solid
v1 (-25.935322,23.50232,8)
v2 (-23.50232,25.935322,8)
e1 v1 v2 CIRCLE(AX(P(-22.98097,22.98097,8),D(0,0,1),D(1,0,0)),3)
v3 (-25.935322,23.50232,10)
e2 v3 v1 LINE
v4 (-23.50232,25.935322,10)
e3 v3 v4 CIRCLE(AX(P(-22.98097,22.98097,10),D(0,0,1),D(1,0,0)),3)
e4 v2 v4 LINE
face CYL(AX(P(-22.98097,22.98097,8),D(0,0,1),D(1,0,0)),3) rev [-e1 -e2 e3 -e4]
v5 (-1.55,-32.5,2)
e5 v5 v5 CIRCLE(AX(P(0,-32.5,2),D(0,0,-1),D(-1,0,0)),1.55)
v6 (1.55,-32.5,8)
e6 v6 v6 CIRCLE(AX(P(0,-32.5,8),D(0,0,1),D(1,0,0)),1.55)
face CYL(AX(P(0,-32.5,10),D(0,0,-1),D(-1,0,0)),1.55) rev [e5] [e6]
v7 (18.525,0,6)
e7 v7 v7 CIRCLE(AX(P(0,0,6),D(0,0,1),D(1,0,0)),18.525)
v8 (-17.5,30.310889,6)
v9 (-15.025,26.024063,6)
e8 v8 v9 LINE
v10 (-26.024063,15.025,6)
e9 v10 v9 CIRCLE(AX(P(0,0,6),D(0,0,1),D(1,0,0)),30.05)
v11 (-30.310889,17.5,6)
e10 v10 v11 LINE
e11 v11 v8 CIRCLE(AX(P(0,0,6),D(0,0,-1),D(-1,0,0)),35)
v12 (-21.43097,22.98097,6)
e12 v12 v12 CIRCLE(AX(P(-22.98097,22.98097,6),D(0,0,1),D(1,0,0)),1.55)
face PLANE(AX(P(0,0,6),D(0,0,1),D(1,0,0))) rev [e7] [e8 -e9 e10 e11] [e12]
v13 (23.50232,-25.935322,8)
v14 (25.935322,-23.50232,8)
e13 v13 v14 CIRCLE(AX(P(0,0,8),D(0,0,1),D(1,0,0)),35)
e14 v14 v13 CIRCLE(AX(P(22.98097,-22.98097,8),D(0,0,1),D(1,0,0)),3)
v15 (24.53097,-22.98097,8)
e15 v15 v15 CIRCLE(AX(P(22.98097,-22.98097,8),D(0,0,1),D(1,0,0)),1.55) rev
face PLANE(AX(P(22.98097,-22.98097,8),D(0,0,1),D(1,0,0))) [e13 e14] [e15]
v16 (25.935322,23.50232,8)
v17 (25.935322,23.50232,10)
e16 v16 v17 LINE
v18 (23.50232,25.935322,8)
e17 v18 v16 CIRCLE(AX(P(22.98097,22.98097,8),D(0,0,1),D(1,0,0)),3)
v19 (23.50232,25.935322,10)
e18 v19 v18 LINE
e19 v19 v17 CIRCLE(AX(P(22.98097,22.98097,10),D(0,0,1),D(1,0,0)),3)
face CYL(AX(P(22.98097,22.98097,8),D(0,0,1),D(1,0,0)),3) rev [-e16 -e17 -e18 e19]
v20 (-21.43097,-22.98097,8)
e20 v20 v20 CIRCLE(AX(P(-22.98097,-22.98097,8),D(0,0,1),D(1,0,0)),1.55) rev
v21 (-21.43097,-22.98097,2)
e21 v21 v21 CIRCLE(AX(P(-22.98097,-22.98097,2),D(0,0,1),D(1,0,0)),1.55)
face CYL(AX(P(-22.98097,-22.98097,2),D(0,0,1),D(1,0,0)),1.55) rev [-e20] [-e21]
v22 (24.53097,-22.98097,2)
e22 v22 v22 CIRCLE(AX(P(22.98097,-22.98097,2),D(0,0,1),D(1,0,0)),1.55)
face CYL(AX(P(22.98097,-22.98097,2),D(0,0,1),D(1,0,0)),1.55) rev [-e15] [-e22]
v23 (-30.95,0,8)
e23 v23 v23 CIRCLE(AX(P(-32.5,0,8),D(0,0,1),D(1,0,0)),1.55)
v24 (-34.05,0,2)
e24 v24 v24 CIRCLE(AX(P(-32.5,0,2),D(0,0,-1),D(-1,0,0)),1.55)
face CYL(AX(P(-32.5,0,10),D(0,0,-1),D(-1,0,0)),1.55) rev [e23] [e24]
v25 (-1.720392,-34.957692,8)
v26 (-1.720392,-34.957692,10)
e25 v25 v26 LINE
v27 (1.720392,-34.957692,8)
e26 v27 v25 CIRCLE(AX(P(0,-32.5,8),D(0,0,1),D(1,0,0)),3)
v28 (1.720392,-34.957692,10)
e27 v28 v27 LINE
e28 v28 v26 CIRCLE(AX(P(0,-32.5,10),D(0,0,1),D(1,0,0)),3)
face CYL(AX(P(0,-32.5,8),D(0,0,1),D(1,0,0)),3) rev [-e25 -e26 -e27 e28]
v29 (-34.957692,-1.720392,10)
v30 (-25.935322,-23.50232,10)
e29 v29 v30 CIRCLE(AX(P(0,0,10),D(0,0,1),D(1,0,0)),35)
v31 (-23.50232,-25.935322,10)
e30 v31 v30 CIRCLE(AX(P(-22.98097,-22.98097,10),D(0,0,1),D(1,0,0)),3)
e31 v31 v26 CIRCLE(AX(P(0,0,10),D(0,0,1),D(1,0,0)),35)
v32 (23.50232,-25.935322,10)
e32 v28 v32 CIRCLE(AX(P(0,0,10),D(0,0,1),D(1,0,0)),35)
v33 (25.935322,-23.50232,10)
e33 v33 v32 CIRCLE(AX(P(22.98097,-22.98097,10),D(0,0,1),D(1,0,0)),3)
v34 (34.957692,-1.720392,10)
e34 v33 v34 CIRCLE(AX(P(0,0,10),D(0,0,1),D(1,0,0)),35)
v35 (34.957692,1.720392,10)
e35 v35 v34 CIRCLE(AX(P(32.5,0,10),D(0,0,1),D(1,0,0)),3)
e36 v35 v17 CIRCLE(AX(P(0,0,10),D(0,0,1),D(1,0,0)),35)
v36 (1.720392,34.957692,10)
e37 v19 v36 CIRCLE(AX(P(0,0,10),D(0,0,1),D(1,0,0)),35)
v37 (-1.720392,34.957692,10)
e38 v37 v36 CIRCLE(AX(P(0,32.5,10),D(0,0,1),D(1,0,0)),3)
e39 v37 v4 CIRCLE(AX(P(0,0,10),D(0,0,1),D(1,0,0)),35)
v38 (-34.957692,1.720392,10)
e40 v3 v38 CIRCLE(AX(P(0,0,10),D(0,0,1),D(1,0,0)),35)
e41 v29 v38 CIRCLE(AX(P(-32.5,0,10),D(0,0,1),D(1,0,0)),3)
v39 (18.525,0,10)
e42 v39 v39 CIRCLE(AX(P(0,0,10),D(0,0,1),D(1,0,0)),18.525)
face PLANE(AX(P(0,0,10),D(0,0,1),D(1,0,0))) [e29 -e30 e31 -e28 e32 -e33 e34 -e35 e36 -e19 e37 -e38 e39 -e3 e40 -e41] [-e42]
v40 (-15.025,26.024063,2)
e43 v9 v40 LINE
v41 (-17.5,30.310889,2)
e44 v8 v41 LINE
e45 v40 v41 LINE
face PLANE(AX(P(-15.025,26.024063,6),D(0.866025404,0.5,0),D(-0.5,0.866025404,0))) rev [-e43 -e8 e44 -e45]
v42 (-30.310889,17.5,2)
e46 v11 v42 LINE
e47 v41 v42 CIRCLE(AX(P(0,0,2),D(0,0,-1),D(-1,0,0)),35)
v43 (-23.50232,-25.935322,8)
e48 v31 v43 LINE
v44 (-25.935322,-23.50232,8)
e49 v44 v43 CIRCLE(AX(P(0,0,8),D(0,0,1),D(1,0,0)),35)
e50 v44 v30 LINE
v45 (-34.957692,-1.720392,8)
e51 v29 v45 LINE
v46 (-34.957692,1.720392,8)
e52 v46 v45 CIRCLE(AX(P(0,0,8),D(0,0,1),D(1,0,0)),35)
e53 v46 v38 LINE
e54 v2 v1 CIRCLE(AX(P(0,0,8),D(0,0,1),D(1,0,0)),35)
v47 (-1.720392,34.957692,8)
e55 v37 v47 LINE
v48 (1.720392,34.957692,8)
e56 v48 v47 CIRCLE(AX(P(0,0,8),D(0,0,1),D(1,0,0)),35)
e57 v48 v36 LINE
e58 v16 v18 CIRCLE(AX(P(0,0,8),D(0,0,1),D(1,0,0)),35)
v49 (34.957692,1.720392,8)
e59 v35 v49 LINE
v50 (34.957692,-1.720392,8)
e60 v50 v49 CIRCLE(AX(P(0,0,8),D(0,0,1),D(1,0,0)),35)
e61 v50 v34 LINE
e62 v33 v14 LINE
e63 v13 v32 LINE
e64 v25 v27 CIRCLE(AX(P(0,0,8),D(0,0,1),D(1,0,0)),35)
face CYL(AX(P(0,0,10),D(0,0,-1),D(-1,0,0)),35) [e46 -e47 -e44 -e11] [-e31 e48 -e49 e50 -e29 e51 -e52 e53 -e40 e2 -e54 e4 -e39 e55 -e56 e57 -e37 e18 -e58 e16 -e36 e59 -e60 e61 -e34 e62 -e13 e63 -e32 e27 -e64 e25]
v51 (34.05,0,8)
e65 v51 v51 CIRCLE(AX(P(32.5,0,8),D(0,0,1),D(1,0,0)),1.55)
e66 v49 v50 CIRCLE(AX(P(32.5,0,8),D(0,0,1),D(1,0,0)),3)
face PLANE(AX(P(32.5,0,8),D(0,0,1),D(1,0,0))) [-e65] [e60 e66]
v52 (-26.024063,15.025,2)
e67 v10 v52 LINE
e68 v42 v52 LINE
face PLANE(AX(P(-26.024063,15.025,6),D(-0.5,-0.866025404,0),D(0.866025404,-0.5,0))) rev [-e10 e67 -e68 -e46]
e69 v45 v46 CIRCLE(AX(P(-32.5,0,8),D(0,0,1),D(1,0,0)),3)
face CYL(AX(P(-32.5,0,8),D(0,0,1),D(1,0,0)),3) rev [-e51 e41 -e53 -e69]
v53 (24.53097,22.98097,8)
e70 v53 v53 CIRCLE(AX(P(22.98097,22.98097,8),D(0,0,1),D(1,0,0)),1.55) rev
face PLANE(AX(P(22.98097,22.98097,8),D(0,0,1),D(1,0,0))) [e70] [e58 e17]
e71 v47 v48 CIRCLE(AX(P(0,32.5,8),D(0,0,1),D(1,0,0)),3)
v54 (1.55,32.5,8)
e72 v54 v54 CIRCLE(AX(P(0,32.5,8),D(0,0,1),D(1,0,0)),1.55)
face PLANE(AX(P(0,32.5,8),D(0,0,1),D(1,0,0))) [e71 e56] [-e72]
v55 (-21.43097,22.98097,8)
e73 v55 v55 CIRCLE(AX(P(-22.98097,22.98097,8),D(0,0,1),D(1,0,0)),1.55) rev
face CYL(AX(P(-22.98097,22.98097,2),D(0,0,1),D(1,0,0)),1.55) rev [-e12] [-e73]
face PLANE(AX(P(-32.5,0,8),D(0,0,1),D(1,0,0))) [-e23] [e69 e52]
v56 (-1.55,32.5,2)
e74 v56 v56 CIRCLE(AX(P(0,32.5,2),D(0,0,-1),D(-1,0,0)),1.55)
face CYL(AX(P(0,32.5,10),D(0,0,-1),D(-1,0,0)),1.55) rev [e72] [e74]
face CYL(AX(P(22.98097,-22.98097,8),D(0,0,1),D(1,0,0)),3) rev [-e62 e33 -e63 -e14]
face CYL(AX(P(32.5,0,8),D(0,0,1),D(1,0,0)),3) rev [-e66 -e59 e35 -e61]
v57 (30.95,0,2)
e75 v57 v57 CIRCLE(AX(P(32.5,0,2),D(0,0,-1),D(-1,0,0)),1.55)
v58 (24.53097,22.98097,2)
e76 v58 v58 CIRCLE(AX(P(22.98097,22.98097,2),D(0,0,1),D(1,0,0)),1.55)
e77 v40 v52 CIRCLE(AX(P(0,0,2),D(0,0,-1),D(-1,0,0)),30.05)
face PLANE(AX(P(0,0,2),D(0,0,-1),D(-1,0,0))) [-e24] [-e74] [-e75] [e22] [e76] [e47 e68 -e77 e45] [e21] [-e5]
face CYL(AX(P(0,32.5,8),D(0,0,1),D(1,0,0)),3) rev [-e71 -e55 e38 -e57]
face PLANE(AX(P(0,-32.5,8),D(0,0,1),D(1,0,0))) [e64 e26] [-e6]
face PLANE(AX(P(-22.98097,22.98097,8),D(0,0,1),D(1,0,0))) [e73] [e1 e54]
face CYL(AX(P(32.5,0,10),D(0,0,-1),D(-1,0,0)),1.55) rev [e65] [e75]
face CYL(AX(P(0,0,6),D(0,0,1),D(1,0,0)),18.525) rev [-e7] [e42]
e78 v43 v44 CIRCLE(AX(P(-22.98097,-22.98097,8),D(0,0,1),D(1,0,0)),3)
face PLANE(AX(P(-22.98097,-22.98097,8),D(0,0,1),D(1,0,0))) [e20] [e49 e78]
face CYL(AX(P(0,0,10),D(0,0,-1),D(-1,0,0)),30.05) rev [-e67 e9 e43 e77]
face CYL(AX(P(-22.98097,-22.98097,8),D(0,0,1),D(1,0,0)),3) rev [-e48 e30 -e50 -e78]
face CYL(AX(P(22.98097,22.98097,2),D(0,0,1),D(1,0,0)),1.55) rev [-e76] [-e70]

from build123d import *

# Parameters (mm, degrees)
EXTRUDE_1_OUTLINE_R   = 35
EXTRUDE_1_OUTLINE_R_2 = 1.55
EXTRUDE_1_OUTLINE_R_3 = 30.05
EXTRUDE_1_DEPTH       = 10
SKETCH_2_R            = 33.525
SKETCH_2_R_2          = 18.525
EXTRUDE_1_2_DEPTH     = 4
SKETCH_3_R            = 1.55
CUT_EXTRUDE_1_DEPTH   = 51.497524692
CUT_EXTRUDE_2_DEPTH   = 6
SKETCH_8_R            = 35
SKETCH_8_R_2          = 30.05
CUT_EXTRUDE_3_DEPTH   = 2
SKETCH_9_R            = 3
CUT_EXTRUDE_4_DEPTH   = 2
SKETCH_10_R           = 1.55
CUT_EXTRUDE_5_DEPTH   = 51.139804547
SKETCH_11_R           = 3
CUT_EXTRUDE_6_DEPTH   = 2


# Read off the part's stored shape, not the designer's step: 凸台-拉伸1
with BuildPart() as part:
    # Extrude 1 outline → Extrude 1 (new body)
    with BuildSketch(Plane.XY):
        Circle(EXTRUDE_1_OUTLINE_R)
        with Locations((0, -32.5)):
            Circle(EXTRUDE_1_OUTLINE_R_2, mode=Mode.SUBTRACT)
        with Locations((-32.5, 0)):
            Circle(EXTRUDE_1_OUTLINE_R_2, mode=Mode.SUBTRACT)
        Circle(EXTRUDE_1_OUTLINE_R_3, mode=Mode.SUBTRACT)
        with Locations((32.5, 0)):
            Circle(EXTRUDE_1_OUTLINE_R_2, mode=Mode.SUBTRACT)
        with Locations((0, 32.5)):
            Circle(EXTRUDE_1_OUTLINE_R_2, mode=Mode.SUBTRACT)
    extrude(amount=EXTRUDE_1_DEPTH)

    # 草图2 → Extrude 1 2 (add)
    with BuildSketch(Plane.XY.offset(10)):
        Circle(SKETCH_2_R)
        Circle(SKETCH_2_R_2, mode=Mode.SUBTRACT)
    extrude(amount=-EXTRUDE_1_2_DEPTH)

    # 草图3 → 切除-拉伸1 (cut, through all)
    with BuildSketch(Plane(origin=(0, 0, 0), x_dir=(-1, 0, 0), z_dir=(0, 0, -1))):
        with Locations(Location((32.5, 0, 0), (0, 0, 180))):
            Circle(SKETCH_3_R)
        with Locations(Location((0, -32.5, 0), (0, 0, 180))):
            Circle(SKETCH_3_R)
        with Locations(Location((-32.5, 0, 0), (0, 0, 180))):
            Circle(SKETCH_3_R)
        with Locations(Location((0, 32.5, 0), (0, 0, 180))):
            Circle(SKETCH_3_R)
    extrude(amount=-CUT_EXTRUDE_1_DEPTH, mode=Mode.SUBTRACT)

    # 草图7 → 切除-拉伸2 (cut)
    with BuildSketch(Plane(origin=(0, 0, 0), x_dir=(-1, 0, 0), z_dir=(0, 0, -1))):
        with BuildLine():
            Line((15.025, 26.024063384), (17.5, 30.310889132))
            ThreePointArc((17.5, 30.310889132), (24.748737342, 24.748737342), (30.310889132, 17.5))
            Line((30.310889132, 17.5), (26.024063384, 15.025))
            ThreePointArc((26.024063384, 15.025), (21.248558775, 21.248558775), (15.025, 26.024063384))
        make_face()
    extrude(amount=-CUT_EXTRUDE_2_DEPTH, mode=Mode.SUBTRACT)

    # 草图8 → 切除-拉伸3 (cut)
    with BuildSketch(Plane(origin=(0, 0, 0), x_dir=(-1, 0, 0), z_dir=(0, 0, -1))):
        with Locations(Location((0, 0, 0), (0, 0, 30))):
            Circle(SKETCH_8_R)
        Circle(SKETCH_8_R_2, mode=Mode.SUBTRACT)
    extrude(amount=-CUT_EXTRUDE_3_DEPTH, mode=Mode.SUBTRACT)

    # 草图9 → 切除-拉伸4 (cut)
    with BuildSketch(Plane.XY.offset(10)):
        with Locations((0, 32.5)):
            Circle(SKETCH_9_R)
        with Locations((32.5, 0)):
            Circle(SKETCH_9_R)
        with Locations((0, -32.5)):
            Circle(SKETCH_9_R)
        with Locations((-32.5, 0)):
            Circle(SKETCH_9_R)
    extrude(amount=-CUT_EXTRUDE_4_DEPTH, mode=Mode.SUBTRACT)

    # 草图10 → 切除-拉伸5 (cut, through all)
    with BuildSketch(Plane.XY.offset(10)):
        with Locations((22.980970389, 22.980970389)):
            Circle(SKETCH_10_R)
        with Locations((22.980970389, -22.980970389)):
            Circle(SKETCH_10_R)
        with Locations((-22.980970389, -22.980970389)):
            Circle(SKETCH_10_R)
        with Locations((-22.980970389, 22.980970389)):
            Circle(SKETCH_10_R)
    extrude(amount=-CUT_EXTRUDE_5_DEPTH, mode=Mode.SUBTRACT)

    # 草图11 → 切除-拉伸6 (cut)
    with BuildSketch(Plane.XY.offset(10)):
        with Locations((22.980970389, 22.980970389)):
            Circle(SKETCH_11_R)
        with Locations((22.980970389, -22.980970389)):
            Circle(SKETCH_11_R)
        with Locations((-22.980970389, -22.980970389)):
            Circle(SKETCH_11_R)
        with Locations((-22.980970389, 22.980970389)):
            Circle(SKETCH_11_R)
    extrude(amount=-CUT_EXTRUDE_6_DEPTH, mode=Mode.SUBTRACT)


solid = part.part
